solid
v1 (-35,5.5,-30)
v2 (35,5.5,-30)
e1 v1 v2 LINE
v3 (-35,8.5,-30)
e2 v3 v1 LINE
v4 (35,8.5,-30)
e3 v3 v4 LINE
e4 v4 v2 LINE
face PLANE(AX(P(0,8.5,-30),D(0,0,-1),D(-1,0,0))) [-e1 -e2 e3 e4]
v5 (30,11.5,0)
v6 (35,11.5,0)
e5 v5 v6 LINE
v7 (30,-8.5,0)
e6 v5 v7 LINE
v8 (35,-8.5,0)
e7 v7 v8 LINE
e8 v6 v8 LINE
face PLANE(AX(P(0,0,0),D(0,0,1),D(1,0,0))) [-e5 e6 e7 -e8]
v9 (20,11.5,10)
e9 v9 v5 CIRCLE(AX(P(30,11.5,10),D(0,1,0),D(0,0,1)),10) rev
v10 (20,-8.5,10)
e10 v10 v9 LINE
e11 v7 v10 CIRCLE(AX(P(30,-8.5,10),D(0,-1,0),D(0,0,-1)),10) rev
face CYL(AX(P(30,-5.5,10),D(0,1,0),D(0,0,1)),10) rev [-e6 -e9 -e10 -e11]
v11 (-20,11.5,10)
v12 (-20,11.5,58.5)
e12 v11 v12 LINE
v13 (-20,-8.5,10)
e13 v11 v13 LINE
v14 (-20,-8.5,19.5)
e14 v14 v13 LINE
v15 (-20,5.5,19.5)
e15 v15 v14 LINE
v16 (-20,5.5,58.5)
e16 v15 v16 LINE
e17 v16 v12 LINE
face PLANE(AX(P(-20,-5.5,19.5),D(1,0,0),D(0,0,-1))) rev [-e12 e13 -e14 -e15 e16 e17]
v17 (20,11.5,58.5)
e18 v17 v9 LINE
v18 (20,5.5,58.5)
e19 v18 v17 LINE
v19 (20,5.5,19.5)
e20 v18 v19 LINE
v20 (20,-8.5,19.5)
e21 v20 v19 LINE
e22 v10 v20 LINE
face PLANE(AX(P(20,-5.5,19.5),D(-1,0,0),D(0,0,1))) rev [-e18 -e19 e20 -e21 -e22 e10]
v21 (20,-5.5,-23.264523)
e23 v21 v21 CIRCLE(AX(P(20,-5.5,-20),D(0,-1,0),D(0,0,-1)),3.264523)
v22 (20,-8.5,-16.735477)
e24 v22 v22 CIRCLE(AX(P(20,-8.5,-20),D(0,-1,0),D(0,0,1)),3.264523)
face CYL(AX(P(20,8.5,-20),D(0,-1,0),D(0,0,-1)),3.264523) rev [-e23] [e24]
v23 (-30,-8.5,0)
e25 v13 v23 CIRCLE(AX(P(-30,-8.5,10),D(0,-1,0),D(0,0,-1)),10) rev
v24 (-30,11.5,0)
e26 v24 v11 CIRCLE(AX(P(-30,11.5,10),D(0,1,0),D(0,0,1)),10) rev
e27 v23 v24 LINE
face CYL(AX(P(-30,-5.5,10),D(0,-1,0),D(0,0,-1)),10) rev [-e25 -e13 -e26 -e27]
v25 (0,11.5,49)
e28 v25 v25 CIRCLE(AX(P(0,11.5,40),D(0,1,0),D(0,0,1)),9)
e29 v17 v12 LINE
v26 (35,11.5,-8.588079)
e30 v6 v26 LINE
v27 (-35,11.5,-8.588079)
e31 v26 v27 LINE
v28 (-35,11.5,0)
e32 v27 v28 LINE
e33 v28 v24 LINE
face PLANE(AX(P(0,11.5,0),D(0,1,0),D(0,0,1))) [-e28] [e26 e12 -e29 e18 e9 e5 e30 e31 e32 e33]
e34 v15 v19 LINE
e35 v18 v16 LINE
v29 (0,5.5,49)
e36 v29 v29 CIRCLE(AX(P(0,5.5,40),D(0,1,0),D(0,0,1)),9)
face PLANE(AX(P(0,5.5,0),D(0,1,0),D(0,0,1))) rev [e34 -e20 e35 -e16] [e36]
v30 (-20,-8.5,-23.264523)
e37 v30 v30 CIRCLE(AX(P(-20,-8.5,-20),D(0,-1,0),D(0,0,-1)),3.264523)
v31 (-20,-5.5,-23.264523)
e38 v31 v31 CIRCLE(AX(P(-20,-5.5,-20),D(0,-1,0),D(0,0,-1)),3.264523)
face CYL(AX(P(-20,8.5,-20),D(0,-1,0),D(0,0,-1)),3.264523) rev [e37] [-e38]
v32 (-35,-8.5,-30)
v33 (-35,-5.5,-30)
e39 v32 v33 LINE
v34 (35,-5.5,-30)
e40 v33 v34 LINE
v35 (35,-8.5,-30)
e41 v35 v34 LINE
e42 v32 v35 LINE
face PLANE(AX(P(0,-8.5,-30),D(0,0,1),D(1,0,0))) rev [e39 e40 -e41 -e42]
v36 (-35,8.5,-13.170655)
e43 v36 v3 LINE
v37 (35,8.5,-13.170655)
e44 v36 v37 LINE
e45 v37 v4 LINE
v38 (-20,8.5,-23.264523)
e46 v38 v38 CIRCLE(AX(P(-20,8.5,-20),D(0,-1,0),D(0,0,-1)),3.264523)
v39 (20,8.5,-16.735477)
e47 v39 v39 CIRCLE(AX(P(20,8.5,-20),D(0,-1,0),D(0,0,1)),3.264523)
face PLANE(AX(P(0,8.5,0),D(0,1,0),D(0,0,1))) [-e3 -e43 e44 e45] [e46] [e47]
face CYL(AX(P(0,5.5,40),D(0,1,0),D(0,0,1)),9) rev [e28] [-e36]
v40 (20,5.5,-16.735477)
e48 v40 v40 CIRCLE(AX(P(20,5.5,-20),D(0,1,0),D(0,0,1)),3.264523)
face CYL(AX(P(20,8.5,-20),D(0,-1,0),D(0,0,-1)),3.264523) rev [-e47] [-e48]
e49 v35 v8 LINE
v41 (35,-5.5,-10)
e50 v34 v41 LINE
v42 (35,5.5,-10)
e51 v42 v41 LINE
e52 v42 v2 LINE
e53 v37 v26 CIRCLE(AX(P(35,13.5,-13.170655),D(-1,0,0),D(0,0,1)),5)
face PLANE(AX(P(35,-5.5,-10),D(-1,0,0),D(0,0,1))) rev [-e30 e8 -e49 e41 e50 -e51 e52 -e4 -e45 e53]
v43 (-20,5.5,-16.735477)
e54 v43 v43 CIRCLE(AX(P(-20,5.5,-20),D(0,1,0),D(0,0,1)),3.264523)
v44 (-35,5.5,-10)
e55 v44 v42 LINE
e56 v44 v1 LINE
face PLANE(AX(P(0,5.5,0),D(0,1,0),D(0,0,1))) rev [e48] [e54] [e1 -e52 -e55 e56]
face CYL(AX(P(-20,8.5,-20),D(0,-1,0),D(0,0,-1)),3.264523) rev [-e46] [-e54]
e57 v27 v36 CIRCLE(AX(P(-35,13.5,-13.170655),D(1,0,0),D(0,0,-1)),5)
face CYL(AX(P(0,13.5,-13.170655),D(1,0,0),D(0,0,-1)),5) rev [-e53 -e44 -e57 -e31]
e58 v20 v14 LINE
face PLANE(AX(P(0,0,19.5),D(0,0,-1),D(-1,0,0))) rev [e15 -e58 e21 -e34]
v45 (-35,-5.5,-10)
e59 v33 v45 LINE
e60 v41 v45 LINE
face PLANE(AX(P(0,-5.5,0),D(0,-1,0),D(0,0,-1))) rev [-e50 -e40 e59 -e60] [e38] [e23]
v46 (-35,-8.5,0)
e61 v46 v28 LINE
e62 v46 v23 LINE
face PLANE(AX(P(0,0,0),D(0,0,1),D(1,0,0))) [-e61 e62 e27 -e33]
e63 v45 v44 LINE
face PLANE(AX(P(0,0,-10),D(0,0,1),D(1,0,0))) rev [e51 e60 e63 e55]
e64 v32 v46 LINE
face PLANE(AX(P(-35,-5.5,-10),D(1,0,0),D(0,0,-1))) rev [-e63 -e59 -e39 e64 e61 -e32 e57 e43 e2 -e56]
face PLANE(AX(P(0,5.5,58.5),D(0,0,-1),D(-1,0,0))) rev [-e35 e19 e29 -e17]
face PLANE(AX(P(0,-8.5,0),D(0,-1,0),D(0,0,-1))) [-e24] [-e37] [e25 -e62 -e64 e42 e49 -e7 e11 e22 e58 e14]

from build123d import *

# Parameters (mm, degrees)
SKETCH1_W                = 40
SKETCH1_H                = 11
BOSS_EXTRUDE1_DEPTH      = 19.5
SKETCH2_W                = 70
SKETCH2_H                = 11
BOSS_EXTRUDE2_DEPTH      = 10
SKETCH3_W                = 70
SKETCH3_H                = 20
SKETCH3_W_2              = 40
SKETCH3_H_2              = 19.5
BOSS_EXTRUDE4_DEPTH      = 3
SKETCH4_W                = 70
SKETCH4_H                = 30
SKETCH4_W_2              = 40
SKETCH4_H_2              = 19.5
BOSS_EXTRUDE5_DEPTH      = 3
SKETCH5_R                = 3.264523149
CUT_EXTRUDE1_DEPTH       = 50.132473986
BOSS_EXTRUDE6_DEPTH      = 3
BOSS_EXTRUDE6_DEPTH_BACK = 3
SKETCH6_W                = 40
SKETCH6_H                = 19.5
SKETCH6_H_2              = 39
SKETCH6_R                = 9
FILLET1_R                = 5
FILLET2_R                = 10


with BuildPart() as part:
    # Sketch1 → Boss-Extrude1 (new body)
    with BuildSketch(Plane.XY):
        Rectangle(SKETCH1_W, SKETCH1_H)
    extrude(amount=BOSS_EXTRUDE1_DEPTH)

    # Sketch2 → Boss-Extrude2 (add)
    with BuildSketch(Plane(origin=(0, 0, 0), x_dir=(-1, 0, 0), z_dir=(0, 0, -1))):
        Rectangle(SKETCH2_W, SKETCH2_H)
    extrude(amount=BOSS_EXTRUDE2_DEPTH)

    # Sketch3 → Boss-Extrude4 (add)
    with BuildSketch(Plane(origin=(0, 5.5, 0), x_dir=(1, 0, 0), z_dir=(0, 1, 0))):
        with Locations((0, 20)):
            Rectangle(SKETCH3_W, SKETCH3_H)
        Polygon((-35, 10), (-35, 0), (-20, 0), (20, 0), (35, 0), (35, 10), align=None)
        with Locations((0, -9.75)):
            Rectangle(SKETCH3_W_2, SKETCH3_H_2)
    extrude(amount=BOSS_EXTRUDE4_DEPTH)

    # Sketch4 → Boss-Extrude5 (add)
    with BuildSketch(Plane.XZ.offset(5.5)):
        with Locations((0, -15)):
            Rectangle(SKETCH4_W, SKETCH4_H)
        with Locations((0, 9.75)):
            Rectangle(SKETCH4_W_2, SKETCH4_H_2)
    extrude(amount=BOSS_EXTRUDE5_DEPTH)

    # Sketch5 → Cut-Extrude1 (cut, through all)
    with BuildSketch(Plane.XZ.offset(8.5)):
        with Locations(Location((-20, -20, 0), (0, 0, 270))):
            Circle(SKETCH5_R)
        with Locations(Location((20, -20, 0), (0, 0, 270))):
            Circle(SKETCH5_R)
    extrude(amount=-CUT_EXTRUDE1_DEPTH, mode=Mode.SUBTRACT)

    # Sketch6 → Boss-Extrude6 (add, two sides: drawn at the far end of the back side and taken through both)
    # profile 1 of 3: a face of its own
    with BuildSketch(Plane(origin=(0, 8.5, 0), x_dir=(1, 0, 0), z_dir=(0, 1, 0)).offset(-BOSS_EXTRUDE6_DEPTH_BACK)):
        Polygon((-20, 0), (20, 0), (35, 0), (35, 8.588079042), (-35, 8.588079042), (-35, 0), align=None)
    # profile 2 of 3: a face of its own
    with BuildSketch(Plane(origin=(0, 8.5, 0), x_dir=(1, 0, 0), z_dir=(0, 1, 0)).offset(-BOSS_EXTRUDE6_DEPTH_BACK)):
        with Locations((0, -9.75)):
            Rectangle(SKETCH6_W, SKETCH6_H)
    # profile 3 of 3: a face of its own
    with BuildSketch(Plane(origin=(0, 8.5, 0), x_dir=(1, 0, 0), z_dir=(0, 1, 0)).offset(-BOSS_EXTRUDE6_DEPTH_BACK)):
        with Locations((0, -39)):
            Rectangle(SKETCH6_W, SKETCH6_H_2)
        with Locations(Location((0, -40, 0), (0, 0, 270))):
            Circle(SKETCH6_R, mode=Mode.SUBTRACT)
    extrude(amount=BOSS_EXTRUDE6_DEPTH + BOSS_EXTRUDE6_DEPTH_BACK)

    # Fillet1
    # the kernel refuses this fillet: 5 mm, written as the material it adds along each edge
    with BuildSketch(Plane(origin=(-35, 8.5, -8.588079042), x_dir=(0, 0, -1), z_dir=(1, 0, 0))) as fillet1_piece_1:
        with BuildLine():
            CenterArc((4.582575695, 5), FILLET1_R, 203.578178478, 66.421821522)
            Line((0, 3), (-0.091651514, 2.96))
            ThreePointArc((-0.091651514, 2.96), (-0.1, 1.5), (-0.1, 0))
            Line((-0.1, 0), (0, -0.1))
            Line((0, -0.1), (4.582575695, -0.1))
            Line((4.582575695, -0.1), (4.582575695, 0))
        make_face()
    extrude(amount=70)

    # Fillet2
    fillet2_edges = [part.edges().sort_by_distance(p)[0] for p in [
        (-20, 1.5, 0),
        (20, 1.5, 0),
    ]]
    fillet(fillet2_edges, radius=FILLET2_R)


solid = part.part
